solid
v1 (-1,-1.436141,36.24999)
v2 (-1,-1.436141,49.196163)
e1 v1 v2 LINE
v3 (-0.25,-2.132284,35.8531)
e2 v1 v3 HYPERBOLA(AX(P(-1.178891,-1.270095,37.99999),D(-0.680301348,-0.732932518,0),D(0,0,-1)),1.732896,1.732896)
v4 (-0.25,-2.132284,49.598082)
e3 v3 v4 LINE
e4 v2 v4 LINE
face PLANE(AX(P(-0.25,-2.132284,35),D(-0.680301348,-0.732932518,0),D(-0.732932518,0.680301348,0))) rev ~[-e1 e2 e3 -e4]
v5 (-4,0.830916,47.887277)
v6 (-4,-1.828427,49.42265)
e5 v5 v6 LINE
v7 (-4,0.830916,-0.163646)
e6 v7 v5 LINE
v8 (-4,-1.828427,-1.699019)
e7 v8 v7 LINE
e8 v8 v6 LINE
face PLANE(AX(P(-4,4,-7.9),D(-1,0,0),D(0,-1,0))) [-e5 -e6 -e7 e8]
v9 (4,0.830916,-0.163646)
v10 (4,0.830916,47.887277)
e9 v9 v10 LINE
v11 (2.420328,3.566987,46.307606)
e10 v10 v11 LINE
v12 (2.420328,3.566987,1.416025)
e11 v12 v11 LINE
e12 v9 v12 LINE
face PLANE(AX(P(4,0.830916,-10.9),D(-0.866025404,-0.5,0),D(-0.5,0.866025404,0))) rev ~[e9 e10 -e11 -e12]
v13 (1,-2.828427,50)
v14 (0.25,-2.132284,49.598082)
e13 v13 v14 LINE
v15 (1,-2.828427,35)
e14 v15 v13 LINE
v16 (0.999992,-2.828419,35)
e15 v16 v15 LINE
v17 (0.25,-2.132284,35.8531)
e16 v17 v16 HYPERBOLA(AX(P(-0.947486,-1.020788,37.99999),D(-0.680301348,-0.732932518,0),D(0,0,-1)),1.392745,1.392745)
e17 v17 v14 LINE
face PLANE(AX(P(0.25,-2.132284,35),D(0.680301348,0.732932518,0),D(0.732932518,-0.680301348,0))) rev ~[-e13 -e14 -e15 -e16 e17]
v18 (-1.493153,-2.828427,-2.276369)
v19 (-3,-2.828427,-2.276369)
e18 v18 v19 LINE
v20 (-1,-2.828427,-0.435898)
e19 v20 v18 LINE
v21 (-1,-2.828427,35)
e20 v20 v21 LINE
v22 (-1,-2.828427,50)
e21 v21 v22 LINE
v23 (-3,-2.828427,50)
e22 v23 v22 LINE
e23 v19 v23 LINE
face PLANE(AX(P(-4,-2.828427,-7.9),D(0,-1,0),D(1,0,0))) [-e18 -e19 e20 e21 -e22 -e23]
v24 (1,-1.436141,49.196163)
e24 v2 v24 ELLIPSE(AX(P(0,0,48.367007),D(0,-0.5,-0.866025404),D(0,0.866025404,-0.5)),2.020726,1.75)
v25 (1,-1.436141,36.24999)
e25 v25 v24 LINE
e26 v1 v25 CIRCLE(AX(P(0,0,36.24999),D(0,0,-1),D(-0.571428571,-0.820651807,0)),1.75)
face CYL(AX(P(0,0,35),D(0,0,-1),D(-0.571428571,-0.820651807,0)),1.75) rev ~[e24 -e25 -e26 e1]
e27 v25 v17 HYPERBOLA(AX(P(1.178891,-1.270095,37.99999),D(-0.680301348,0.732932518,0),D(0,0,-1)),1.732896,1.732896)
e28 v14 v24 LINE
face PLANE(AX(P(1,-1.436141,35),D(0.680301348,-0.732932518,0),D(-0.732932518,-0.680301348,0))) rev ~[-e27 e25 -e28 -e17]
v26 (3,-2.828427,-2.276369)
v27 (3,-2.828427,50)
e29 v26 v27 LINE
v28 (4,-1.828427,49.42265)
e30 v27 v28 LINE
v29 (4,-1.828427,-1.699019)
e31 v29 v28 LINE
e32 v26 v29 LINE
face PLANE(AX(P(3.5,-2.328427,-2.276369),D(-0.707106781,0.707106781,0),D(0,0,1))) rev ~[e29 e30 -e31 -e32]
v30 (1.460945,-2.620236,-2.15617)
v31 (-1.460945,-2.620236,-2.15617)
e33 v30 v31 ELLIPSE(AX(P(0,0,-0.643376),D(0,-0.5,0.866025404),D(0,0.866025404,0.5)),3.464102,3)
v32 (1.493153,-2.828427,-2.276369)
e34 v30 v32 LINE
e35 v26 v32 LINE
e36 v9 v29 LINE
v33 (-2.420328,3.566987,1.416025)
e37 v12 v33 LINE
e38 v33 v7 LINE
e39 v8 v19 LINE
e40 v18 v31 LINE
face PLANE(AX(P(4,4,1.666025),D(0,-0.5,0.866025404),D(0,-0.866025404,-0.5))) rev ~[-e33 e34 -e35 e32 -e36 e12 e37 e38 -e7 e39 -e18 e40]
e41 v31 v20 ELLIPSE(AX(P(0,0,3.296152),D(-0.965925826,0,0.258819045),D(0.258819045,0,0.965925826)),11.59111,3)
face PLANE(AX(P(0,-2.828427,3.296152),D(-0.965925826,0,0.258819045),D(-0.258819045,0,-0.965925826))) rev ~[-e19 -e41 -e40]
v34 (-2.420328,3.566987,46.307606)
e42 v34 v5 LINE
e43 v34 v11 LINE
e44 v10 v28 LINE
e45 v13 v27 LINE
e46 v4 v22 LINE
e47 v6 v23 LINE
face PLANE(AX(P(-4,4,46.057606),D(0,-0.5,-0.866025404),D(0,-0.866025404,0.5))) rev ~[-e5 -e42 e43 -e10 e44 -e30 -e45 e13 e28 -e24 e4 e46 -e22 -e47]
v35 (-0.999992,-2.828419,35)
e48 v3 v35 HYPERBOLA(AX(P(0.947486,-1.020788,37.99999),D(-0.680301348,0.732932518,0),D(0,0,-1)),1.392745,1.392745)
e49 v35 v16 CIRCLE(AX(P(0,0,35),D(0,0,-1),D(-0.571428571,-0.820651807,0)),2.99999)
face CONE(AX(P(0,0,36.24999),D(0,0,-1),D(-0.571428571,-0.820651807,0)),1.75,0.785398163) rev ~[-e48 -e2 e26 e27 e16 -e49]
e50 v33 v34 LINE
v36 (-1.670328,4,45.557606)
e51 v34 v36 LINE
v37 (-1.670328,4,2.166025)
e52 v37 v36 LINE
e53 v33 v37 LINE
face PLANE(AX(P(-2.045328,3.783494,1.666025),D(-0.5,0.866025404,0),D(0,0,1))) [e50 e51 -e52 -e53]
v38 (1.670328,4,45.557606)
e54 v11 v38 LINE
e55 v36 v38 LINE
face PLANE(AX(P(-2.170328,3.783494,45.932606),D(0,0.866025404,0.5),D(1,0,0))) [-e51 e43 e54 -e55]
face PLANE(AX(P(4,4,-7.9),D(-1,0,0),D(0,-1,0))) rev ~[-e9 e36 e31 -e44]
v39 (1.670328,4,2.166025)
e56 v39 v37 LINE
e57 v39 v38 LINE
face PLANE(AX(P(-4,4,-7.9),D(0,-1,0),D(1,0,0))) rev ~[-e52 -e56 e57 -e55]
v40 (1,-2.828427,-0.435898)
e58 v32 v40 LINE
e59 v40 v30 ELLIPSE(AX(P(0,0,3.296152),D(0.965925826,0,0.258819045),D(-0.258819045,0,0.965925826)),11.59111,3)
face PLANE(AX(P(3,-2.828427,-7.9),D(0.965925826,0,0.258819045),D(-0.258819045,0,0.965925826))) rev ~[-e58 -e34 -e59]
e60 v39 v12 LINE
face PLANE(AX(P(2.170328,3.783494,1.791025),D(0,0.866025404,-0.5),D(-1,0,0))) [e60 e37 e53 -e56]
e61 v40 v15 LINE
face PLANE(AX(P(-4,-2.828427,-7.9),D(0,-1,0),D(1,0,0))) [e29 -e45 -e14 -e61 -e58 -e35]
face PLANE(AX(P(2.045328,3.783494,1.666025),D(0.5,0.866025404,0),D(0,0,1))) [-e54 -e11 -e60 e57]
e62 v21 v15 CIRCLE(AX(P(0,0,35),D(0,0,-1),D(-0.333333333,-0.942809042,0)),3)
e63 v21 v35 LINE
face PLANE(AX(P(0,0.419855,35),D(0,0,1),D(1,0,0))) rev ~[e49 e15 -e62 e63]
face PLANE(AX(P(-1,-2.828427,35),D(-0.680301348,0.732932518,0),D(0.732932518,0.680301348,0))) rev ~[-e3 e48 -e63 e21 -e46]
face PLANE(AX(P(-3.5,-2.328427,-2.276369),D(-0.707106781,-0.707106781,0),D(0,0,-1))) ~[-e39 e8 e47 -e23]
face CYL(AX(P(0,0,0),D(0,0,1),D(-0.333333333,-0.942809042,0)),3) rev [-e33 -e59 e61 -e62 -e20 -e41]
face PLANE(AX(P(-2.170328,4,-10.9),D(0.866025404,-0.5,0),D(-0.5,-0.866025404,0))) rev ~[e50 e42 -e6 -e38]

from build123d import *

# Parameters (mm, degrees)
F1_DEPTH  = 20
F2_DEPTH  = 15
F3_W      = 8
F3_H      = 0.1715728753
F4_DEPTH  = 35.001
F6_DEPTH  = 15
F7_SIZE   = 1.24999
F8_DEPTH  = 7.9
F9_W      = 8
F9_H      = 6.8284271247
F10_DEPTH = 3
F13_DEPTH = 3
F15_DEPTH = 8.001
F17_DEPTH = 60.901
F19_DEPTH = 8.001
F20_SIZE  = 1
F21_SIZE  = 0.5


# Not quite as in the source:
# - a fillet or chamfer is up to 0.001 mm smaller than in the source, because OpenCascade refuses the exact size


with BuildPart() as f1:
    # F0 (on Top) → F1 (new body)
    with BuildSketch(Plane.XY):
        with BuildLine():
            ThreePointArc((-1, -2.8284271247), (0, 3), (1, -2.8284271247))
            Line((1, -2.8284271247), (1, -3))
            Line((1, -3), (4, -3))
            Line((4, -3), (4, 4))
            Line((4, 4), (0, 4))
            Line((0, 4), (-4, 4))
            Line((-4, 4), (-4, -3))
            Line((-4, -3), (-1, -3))
            Line((-1, -3), (-1, -2.8284271247))
        make_face()
    extrude(amount=F1_DEPTH)

    # F2 (add): a face of the model
    f2_faces = [f1.faces().sort_by_distance(p)[0] for p in [
        (0, 3.1063014581, 20),
    ]]
    extrude(f2_faces, amount=F2_DEPTH)

    # F3 (on face) → F4 (cut, through all)
    with BuildSketch(Plane.XY.offset(35)):
        with Locations((0, -2.9142135624)):
            Rectangle(F3_W, F3_H)
    extrude(amount=-F4_DEPTH, mode=Mode.SUBTRACT)

    # F5 (on face) → F6 (join)
    with BuildSketch(Plane.XY.offset(35)):
        with BuildLine():
            ThreePointArc((-1, -1.4361406616), (0, 1.75), (1, -1.4361406616))
            Line((1, -1.4361406616), (0.25, -2.1322838932))
            Line((0.25, -2.1322838932), (1, -2.8284271247))
            Line((1, -2.8284271247), (4, -2.8284271247))
            Line((4, -2.8284271247), (4, 4))
            Line((4, 4), (-4, 4))
            Line((-4, 4), (-4, -2.8284271247))
            Line((-4, -2.8284271247), (-1, -2.8284271247))
            Line((-1, -2.8284271247), (-0.25, -2.1322838932))
            Line((-0.25, -2.1322838932), (-1, -1.4361406616))
        make_face()
    extrude(amount=F6_DEPTH)

    # F7 (size 1.25 in the source; OpenCascade refuses exactly that, so slightly less here)
    f7_edges = [f1.edges().sort_by_distance(p)[0] for p in [
        (0, 1.75, 35),
    ]]
    chamfer(f7_edges, length=F7_SIZE)

    # F8 (add): a face of the model
    f8_faces = [f1.faces().sort_by_distance(p)[0] for p in [
        (-2.5, -2.7232475559, 0),
    ]]
    extrude(f8_faces, amount=F8_DEPTH)

    # F9 (on face) → F10 (join)
    with BuildSketch(Plane(origin=(0, 0, -7.9), x_dir=(1, 0, 0), z_dir=(0, 0, -1))):
        with Locations((0, -0.5857864376)):
            Rectangle(F9_W, F9_H)
    extrude(amount=F10_DEPTH)

    # F12 (on face) → F13 (cut)
    with BuildSketch(Plane.XZ.offset(2.8284271247)):
        Polygon((0, 3.2961524227), (-3, -7.9), (1, -7.9), (3, -7.9), align=None)
    extrude(amount=-F13_DEPTH, mode=Mode.SUBTRACT)

    # F14 (on face) → F15 (cut, through all)
    with BuildSketch(Plane(origin=(-4, 0, 0), x_dir=(0, -1, 0), z_dir=(-1, 0, 0))):
        Polygon((-4, 46.0576057614), (2.8284271247, 50), (-4, 50), align=None)
    extrude(amount=-F15_DEPTH, mode=Mode.SUBTRACT)

    # F16 (on face) → F17 (cut, through all)
    with BuildSketch(Plane(origin=(0, 0, -10.9), x_dir=(1, 0, 0), z_dir=(0, 0, -1))):
        Polygon((4, -0.8309159426), (2.1703284663, -4), (4, -4), align=None)
        Polygon((-2.1703284663, -4), (-4, -0.8309159426), (-4, -4), align=None)
    extrude(amount=-F17_DEPTH, mode=Mode.SUBTRACT)

    # F18 (on face) → F19 (cut, through all)
    with BuildSketch(Plane.YZ.offset(4)):
        Polygon((4, 1.6660254038), (-2.8284271247, -2.2763688348), (-2.8284271247, -10.9), (4, -10.9), align=None)
    extrude(amount=-F19_DEPTH, mode=Mode.SUBTRACT)

    # F20
    f20_edges = [f1.edges().sort_by_distance(p)[0] for p in [
        (-4, -2.828427, 23.861816),
        (4, -2.828427, 23.861816),
    ]]
    chamfer(f20_edges, length=F20_SIZE)

    # F21
    f21_edges = [f1.edges().sort_by_distance(p)[0] for p in [
        (-2.170328, 4, 23.861816),
        (0, 4, 46.057606),
        (2.170328, 4, 23.861816),
        (0, 4, 1.666025),
    ]]
    chamfer(f21_edges, length=F21_SIZE)


solid = f1.part
